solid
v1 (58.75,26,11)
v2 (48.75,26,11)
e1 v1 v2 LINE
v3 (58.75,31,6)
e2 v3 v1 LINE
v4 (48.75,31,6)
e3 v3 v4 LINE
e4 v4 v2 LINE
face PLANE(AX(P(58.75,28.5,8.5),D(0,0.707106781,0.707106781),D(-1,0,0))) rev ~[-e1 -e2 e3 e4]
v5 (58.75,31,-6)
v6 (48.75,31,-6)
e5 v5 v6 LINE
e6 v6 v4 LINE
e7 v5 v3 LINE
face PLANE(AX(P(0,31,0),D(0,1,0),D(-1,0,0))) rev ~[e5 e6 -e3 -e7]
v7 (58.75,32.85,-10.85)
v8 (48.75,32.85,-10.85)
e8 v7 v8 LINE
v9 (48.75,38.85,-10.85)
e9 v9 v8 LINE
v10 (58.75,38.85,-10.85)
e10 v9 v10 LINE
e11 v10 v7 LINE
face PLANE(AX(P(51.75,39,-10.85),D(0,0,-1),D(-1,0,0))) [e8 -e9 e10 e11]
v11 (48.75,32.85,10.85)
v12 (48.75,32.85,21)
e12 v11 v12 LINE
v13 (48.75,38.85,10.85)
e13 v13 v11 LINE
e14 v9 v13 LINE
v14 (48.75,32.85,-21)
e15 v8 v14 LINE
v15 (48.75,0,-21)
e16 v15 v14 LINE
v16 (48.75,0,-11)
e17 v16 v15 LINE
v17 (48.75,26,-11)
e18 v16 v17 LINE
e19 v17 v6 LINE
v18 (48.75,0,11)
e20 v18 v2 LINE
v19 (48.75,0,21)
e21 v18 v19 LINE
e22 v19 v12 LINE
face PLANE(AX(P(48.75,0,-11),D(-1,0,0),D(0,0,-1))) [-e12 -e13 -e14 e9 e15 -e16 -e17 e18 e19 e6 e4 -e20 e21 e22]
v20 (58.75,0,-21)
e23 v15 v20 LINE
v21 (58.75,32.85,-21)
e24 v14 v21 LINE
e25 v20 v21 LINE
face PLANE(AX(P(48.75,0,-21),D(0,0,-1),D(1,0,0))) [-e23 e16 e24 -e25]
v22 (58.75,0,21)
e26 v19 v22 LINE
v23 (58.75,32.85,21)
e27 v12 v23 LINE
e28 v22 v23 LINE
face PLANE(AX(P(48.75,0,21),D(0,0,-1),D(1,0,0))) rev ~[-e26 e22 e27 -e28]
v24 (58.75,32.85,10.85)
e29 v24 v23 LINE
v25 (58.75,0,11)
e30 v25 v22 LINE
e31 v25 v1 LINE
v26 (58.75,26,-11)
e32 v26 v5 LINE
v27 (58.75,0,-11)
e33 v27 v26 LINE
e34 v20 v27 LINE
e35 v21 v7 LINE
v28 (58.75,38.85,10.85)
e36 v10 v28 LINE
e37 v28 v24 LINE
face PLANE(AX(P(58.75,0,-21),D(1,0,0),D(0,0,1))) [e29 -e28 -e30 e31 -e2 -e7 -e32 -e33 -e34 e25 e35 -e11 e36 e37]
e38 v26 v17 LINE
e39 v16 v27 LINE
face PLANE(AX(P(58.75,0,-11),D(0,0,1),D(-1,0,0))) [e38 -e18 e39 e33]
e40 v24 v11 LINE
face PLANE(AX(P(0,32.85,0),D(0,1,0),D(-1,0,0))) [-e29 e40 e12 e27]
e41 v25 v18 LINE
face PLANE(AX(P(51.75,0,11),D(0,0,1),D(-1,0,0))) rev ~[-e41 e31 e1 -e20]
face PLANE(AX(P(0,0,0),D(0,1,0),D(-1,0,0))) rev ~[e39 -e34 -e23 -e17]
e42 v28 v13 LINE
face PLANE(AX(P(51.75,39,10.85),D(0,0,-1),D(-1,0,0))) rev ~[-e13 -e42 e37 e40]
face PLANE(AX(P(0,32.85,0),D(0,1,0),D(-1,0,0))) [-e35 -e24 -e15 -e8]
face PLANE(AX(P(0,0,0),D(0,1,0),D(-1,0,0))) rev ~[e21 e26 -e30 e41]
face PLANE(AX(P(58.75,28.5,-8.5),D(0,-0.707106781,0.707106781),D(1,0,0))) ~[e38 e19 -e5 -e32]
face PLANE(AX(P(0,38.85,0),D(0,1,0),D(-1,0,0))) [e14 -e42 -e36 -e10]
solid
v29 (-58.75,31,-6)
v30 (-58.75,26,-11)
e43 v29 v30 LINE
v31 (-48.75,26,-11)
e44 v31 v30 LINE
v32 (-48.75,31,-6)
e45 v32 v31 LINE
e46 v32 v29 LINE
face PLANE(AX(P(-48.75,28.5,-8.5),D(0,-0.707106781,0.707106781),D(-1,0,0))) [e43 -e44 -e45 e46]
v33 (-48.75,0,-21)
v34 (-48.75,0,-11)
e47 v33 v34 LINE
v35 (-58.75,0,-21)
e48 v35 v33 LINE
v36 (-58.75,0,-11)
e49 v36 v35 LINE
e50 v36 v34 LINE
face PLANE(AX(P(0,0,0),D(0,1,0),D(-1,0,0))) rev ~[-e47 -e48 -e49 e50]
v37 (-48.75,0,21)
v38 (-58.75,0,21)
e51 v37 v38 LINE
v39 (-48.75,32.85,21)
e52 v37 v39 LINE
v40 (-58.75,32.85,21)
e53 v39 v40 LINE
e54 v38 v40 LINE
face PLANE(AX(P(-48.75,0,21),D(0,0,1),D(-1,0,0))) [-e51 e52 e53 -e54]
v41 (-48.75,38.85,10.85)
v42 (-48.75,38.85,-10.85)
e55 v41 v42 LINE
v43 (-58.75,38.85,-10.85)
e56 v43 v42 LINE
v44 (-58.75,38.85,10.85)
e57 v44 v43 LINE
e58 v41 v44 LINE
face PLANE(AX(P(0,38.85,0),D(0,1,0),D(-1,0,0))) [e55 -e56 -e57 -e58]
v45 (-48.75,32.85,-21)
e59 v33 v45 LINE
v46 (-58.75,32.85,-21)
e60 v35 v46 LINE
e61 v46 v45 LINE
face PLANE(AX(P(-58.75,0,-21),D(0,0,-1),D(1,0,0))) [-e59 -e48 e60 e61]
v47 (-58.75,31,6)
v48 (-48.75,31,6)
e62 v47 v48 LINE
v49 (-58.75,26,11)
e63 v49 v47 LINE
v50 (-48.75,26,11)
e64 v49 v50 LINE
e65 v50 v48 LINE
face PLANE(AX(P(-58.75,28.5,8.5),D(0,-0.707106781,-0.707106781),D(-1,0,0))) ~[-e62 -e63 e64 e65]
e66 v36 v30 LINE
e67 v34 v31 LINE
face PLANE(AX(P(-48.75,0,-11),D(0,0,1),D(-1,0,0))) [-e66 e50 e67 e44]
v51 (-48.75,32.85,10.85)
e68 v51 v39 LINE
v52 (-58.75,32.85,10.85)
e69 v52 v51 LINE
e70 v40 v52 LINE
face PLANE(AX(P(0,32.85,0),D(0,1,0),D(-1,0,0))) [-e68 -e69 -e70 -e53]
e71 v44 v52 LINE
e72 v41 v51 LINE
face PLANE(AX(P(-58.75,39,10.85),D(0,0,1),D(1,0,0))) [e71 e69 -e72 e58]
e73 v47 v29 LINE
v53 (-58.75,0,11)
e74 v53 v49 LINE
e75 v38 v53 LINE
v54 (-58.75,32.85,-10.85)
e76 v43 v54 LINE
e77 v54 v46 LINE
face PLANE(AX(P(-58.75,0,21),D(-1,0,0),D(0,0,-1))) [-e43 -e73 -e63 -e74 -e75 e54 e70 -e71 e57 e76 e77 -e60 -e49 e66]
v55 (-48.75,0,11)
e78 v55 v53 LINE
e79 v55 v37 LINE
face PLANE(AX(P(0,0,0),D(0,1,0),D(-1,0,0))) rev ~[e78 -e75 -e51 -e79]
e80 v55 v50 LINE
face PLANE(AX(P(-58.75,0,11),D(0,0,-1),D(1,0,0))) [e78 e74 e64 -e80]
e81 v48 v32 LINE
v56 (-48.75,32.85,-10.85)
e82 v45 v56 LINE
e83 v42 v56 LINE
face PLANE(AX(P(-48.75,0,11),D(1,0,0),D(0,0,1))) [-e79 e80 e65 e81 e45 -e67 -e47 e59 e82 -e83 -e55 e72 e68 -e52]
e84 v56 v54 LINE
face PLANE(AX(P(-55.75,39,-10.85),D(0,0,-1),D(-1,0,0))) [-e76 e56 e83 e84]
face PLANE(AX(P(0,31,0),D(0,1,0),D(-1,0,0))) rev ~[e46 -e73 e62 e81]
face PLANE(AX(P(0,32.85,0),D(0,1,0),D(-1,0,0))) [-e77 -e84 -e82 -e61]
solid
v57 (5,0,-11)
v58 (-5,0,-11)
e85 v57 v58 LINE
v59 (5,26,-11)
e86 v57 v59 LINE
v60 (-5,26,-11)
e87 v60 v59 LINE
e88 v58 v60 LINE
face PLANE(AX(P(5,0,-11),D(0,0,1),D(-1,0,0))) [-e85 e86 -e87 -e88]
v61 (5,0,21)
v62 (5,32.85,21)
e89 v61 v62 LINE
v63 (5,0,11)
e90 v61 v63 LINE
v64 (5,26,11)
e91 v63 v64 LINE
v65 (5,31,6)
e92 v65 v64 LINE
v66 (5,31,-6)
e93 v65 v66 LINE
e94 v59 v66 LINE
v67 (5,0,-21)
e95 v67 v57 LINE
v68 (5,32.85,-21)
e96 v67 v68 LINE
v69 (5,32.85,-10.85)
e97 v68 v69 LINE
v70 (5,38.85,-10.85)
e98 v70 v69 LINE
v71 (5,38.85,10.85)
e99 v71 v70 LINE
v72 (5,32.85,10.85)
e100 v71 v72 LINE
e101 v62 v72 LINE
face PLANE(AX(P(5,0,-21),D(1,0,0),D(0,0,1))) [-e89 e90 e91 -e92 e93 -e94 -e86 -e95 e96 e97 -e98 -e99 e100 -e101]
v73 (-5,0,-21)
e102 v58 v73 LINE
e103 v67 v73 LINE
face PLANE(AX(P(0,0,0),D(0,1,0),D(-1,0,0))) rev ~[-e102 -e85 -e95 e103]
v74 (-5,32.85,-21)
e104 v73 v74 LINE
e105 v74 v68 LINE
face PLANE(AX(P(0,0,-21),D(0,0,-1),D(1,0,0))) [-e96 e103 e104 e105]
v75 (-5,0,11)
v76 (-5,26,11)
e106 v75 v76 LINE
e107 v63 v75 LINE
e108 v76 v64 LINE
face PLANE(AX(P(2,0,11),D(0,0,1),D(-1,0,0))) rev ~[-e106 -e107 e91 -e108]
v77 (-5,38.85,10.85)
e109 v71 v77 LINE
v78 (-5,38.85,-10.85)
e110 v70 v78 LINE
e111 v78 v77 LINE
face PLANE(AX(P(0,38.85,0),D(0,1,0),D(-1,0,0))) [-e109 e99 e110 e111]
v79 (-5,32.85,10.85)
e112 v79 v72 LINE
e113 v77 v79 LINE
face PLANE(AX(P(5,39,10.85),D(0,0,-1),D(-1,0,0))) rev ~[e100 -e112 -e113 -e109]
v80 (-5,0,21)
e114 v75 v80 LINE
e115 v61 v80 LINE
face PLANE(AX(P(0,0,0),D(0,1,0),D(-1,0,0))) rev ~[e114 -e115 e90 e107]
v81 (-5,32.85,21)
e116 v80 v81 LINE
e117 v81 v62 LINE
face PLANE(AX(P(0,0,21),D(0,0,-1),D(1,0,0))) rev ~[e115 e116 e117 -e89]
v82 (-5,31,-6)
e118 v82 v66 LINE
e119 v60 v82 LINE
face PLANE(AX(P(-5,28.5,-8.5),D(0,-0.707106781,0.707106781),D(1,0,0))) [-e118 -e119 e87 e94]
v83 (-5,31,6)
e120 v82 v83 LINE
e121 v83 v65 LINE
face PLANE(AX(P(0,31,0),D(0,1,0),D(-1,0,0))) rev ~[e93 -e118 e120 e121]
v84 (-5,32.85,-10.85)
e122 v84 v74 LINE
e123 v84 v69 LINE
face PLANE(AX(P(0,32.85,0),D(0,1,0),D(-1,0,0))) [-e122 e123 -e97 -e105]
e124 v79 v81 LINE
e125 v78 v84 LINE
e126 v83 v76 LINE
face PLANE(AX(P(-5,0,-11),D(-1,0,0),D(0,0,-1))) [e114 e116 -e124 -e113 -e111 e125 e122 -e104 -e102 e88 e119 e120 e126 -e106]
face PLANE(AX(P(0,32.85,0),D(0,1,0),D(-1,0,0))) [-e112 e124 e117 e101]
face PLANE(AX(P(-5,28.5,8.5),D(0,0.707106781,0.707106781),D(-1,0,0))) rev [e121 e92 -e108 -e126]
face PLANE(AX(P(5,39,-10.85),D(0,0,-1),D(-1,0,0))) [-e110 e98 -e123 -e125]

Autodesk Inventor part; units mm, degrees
ref_plane "YZ Plane" through (0, 0, 0) normal (1, 0, 0) x (0, 1, 0)
ref_plane "XY Plane" through (0, 0, 0) normal (0, 0, 1) x (1, 0, 0)
sketch "スケッチ1" plane through (0, 0, 0) normal (0, 1, 0) x (-1, 0, 0)
  line L0 (-58.75, -21) -> (-58.75, 21)
  line L1 (58.75, 21) -> (58.75, -21)
  line L2 (0, -29.4) -> (0, 29.4) projected
  line L3 (-82.25, 0) -> (82.25, 0) projected
  line L4 (58.75, -21) -> (48.75, -21)
  line L5 (48.75, -21) -> (48.75, -11)
  line L6 (48.75, -11) -> (58.75, -11)
  line L7 (58.75, -11) -> (58.75, -21)
  line L8 (5, -21) -> (-5, -21)
  line L9 (-5, -21) -> (-5, -11)
  line L10 (-5, -11) -> (5, -11)
  line L11 (5, -11) -> (5, -21)
  line L12 (-48.75, -21) -> (-58.75, -21)
  line L13 (-58.75, -21) -> (-58.75, -11)
  line L14 (-58.75, -11) -> (-48.75, -11)
  line L15 (-48.75, -11) -> (-48.75, -21)
  line L16 (-58.75, 11) -> (-48.75, 11)
  line L17 (-48.75, 11) -> (-48.75, 21)
  line L18 (-48.75, 21) -> (-58.75, 21)
  line L19 (-58.75, 21) -> (-58.75, 11)
  line L20 (5, 21) -> (-5, 21)
  line L21 (-5, 21) -> (-5, 11)
  line L22 (-5, 11) -> (5, 11)
  line L23 (5, 11) -> (5, 21)
  line L24 (58.75, 11) -> (48.75, 11)
  line L25 (48.75, 11) -> (48.75, 21)
  line L26 (48.75, 21) -> (58.75, 21)
  line L27 (58.75, 21) -> (58.75, 11)
  line L28 (5, -11) -> (5, 11)
  line L29 (48.75, 11) -> (48.75, -11)
  line L30 (-48.75, -11) -> (-48.75, 11)
  line L31 (-5, 11) -> (-5, -11)
  line L32 (55.75, 11) -> (55.75, -11)
  line L33 (-55.75, -11) -> (-55.75, 11)
  line L34 (2, 11) -> (2, -11)
  line L35 (-2, -11) -> (-2, 11)
  line L36 (51.75, -11) -> (51.75, 11)
  line L37 (-51.75, -11) -> (-51.75, 11)
  line L38 (-58.75, 21) -> (-48.75, 21)
  line L39 (-5, 21) -> (5, 21)
  line L40 (48.75, 21) -> (58.75, 21)
  line L41 (58.75, -21) -> (48.75, -21)
  line L42 (5, -21) -> (-5, -21)
  line L43 (-48.75, -21) -> (-58.75, -21)
  point P0 (0, 0)
  dimension "d0" = 117.5
  dimension "d2" = 10
  dimension "d10" = 3
  dimension "d13" = 3
  dimension "d92" = 3
  dimension "d119" = 22
  dimension "d120" = 10
extrude "押し出し1" add sketch "スケッチ1" along normal blind 33 contours L0 L14 L15 L12 | L0 L18 L17 L16 | L1 L24 L25 L26 | L1 L4 L5 L6 | L8 L9 L10 L2 | L2 L10 L11 L8 | L22 L21 L20 L2 | L2 L20 L23 L22
extrude "押し出し4" [suppressed]
ref_plane "作業平面2" through (0, 39, 0) normal (0, 1, 0) x (-1, 0, 0)
sketch "スケッチ2" plane through (0, 39, 0) normal (0, 1, 0) x (-1, 0, 0)
  line L0 (58.75, 21) -> (58.75, -21) projected
  line L1 (55.75, 11) -> (55.75, -11) projected
  line L2 (51.75, -11) -> (51.75, 11) projected
  line L3 (48.75, 11) -> (48.75, -11) projected
  line L4 (58.75, 11) -> (48.75, 11) projected
  line L5 (48.75, -11) -> (58.75, -11) projected
  line L6 (58.75, -21) -> (48.75, -21) projected
  line L7 (48.75, -21) -> (48.75, -11) projected
  line L8 (48.75, 11) -> (48.75, 21) projected
  line L9 (5, 11) -> (5, 21) projected
  line L10 (-5, 11) -> (5, 11) projected
  line L11 (-5, 21) -> (-5, 11) projected
  line L12 (5, -11) -> (5, -21) projected
  line L13 (-5, -11) -> (5, -11) projected
  line L14 (-5, -21) -> (-5, -11) projected
  line L15 (5, -21) -> (-5, -21) projected
  line L16 (-5, 11) -> (-5, -11) projected
  line L17 (-2, -11) -> (-2, 11) projected
  line L18 (2, 11) -> (2, -11) projected
  line L19 (5, -11) -> (5, 11) projected
  line L20 (-48.75, 11) -> (-48.75, 21) projected
  line L21 (-48.75, -11) -> (-48.75, 11) projected
  line L22 (-48.75, -11) -> (-48.75, -21) projected
  line L23 (-58.75, -21) -> (-58.75, 21) projected
  line L24 (-58.75, -11) -> (-48.75, -11) projected
  line L25 (-58.75, 11) -> (-48.75, 11) projected
  line L26 (-51.75, -11) -> (-51.75, 11) projected
  line L27 (-55.75, -11) -> (-55.75, 11) projected
extrude "押し出し6" add sketch "スケッチ2" against normal blind 8 contours L0 L5 L1 L4 | L1 L5 L2 L4 | L2 L5 L3 L4 | L10 L17 L13 L16 | L10 L18 L13 L17 | L10 L19 L13 L18 | L24 L26 L25 L21 | L24 L27 L25 L26 | L24 L23 L25 L27
extrude "押し出し7" [suppressed]
thicken "厚み1" operation cut thickness 0.15 both sides no extend neighbours no toward (0, -1, 0) faces at (55.4167, 33, -14.3333) (55.4167, 33, 17.6667) (52.0833, 37, 11) (55.4167, 37, -11) (55.4167, 39, 3.6667)
thicken "厚み2" operation cut thickness 0.15 both sides no extend neighbours no toward (0, -1, 0) faces at (1.6667, 33, -14.3333) (1.6667, 33, 17.6667) (1.6667, 39, 3.6667) (1.6667, 37, -11) (-1.6667, 37, 11)
thicken "厚み3" operation cut thickness 0.15 both sides no extend neighbours no toward (0, -1, 0) faces at (-52.0833, 33, -14.3333) (-52.0833, 33, 17.6667) (-55.4167, 37, 11) (-55.4167, 39, -3.6667) (-52.0833, 37, -11)
sketch "SupportBase" plane through (0, 0, 0) normal (0, -1, 0) x (1, 0, 0)
  line L0 (-48.75, 11) -> (-48.75, -11)
  line L1 (-48.75, -11) -> (-5, -11)
  line L2 (-48.75, 11) -> (-5, 11)
  line L3 (-5, 11) -> (-5, -11)
  line L4 (5, 11) -> (5, -11)
  line L5 (5, -11) -> (48.75, -11)
  line L6 (48.75, -11) -> (48.75, 11)
  line L7 (5, 11) -> (48.75, 11)
sketch "SupportTarget" plane through (0, 31, 0) normal (0, -1, 0) x (1, 0, 0)
  line L0 (48.75, 11) -> (58.75, 11) projected
  line L1 (48.75, 11) -> (48.75, -11) projected
  line L2 (58.75, -11) -> (48.75, -11) projected
  line L3 (58.75, -11) -> (58.75, 11) projected
  line L4 (-5, 11) -> (5, 11) projected
  line L5 (-5, 11) -> (-5, -11) projected
  line L6 (5, -11) -> (-5, -11) projected
  line L7 (5, -11) -> (5, 11) projected
  line L8 (-58.75, 11) -> (-58.75, -11) projected
  line L9 (-48.75, -11) -> (-58.75, -11) projected
  line L10 (-48.75, -11) -> (-48.75, 11) projected
  line L11 (-58.75, 11) -> (-48.75, 11) projected
chamfer "面取り6" distance 5 angle 45 6 edges at (-53.75, 31, -11) (0, 31, -11) (53.75, 31, -11) (-53.75, 31, 11) (0, 31, 11) (53.75, 31, 11)
equation "\"d2\" = VPW"
equation "\"d10\" = ID"
equation "\"d13\" = ID"
equation "\"d4\" = UnitHeight"
equation "\"d14\" = 2 * ID"
equation "\"d25\" = VBW"
equation "\"d27\" = 2 * ID"
equation "\"d36\" = OF"
equation "\"d3\" = VPW"
equation "\"UnitHeight\" = 0.5 * ViaductHeight"
equation "\"ID\" = 3"
equation "\"VPW\" = 10"
equation "\"d11\" = ID"
equation "\"VBW\" = 8"
equation "\"OF\" = 0.15"
equation "\"d37\" = UnitHeight + 2 * ID"
equation "\"ViaductHeight\" = 66"
properties part number "ViaductPillarsUnit"
